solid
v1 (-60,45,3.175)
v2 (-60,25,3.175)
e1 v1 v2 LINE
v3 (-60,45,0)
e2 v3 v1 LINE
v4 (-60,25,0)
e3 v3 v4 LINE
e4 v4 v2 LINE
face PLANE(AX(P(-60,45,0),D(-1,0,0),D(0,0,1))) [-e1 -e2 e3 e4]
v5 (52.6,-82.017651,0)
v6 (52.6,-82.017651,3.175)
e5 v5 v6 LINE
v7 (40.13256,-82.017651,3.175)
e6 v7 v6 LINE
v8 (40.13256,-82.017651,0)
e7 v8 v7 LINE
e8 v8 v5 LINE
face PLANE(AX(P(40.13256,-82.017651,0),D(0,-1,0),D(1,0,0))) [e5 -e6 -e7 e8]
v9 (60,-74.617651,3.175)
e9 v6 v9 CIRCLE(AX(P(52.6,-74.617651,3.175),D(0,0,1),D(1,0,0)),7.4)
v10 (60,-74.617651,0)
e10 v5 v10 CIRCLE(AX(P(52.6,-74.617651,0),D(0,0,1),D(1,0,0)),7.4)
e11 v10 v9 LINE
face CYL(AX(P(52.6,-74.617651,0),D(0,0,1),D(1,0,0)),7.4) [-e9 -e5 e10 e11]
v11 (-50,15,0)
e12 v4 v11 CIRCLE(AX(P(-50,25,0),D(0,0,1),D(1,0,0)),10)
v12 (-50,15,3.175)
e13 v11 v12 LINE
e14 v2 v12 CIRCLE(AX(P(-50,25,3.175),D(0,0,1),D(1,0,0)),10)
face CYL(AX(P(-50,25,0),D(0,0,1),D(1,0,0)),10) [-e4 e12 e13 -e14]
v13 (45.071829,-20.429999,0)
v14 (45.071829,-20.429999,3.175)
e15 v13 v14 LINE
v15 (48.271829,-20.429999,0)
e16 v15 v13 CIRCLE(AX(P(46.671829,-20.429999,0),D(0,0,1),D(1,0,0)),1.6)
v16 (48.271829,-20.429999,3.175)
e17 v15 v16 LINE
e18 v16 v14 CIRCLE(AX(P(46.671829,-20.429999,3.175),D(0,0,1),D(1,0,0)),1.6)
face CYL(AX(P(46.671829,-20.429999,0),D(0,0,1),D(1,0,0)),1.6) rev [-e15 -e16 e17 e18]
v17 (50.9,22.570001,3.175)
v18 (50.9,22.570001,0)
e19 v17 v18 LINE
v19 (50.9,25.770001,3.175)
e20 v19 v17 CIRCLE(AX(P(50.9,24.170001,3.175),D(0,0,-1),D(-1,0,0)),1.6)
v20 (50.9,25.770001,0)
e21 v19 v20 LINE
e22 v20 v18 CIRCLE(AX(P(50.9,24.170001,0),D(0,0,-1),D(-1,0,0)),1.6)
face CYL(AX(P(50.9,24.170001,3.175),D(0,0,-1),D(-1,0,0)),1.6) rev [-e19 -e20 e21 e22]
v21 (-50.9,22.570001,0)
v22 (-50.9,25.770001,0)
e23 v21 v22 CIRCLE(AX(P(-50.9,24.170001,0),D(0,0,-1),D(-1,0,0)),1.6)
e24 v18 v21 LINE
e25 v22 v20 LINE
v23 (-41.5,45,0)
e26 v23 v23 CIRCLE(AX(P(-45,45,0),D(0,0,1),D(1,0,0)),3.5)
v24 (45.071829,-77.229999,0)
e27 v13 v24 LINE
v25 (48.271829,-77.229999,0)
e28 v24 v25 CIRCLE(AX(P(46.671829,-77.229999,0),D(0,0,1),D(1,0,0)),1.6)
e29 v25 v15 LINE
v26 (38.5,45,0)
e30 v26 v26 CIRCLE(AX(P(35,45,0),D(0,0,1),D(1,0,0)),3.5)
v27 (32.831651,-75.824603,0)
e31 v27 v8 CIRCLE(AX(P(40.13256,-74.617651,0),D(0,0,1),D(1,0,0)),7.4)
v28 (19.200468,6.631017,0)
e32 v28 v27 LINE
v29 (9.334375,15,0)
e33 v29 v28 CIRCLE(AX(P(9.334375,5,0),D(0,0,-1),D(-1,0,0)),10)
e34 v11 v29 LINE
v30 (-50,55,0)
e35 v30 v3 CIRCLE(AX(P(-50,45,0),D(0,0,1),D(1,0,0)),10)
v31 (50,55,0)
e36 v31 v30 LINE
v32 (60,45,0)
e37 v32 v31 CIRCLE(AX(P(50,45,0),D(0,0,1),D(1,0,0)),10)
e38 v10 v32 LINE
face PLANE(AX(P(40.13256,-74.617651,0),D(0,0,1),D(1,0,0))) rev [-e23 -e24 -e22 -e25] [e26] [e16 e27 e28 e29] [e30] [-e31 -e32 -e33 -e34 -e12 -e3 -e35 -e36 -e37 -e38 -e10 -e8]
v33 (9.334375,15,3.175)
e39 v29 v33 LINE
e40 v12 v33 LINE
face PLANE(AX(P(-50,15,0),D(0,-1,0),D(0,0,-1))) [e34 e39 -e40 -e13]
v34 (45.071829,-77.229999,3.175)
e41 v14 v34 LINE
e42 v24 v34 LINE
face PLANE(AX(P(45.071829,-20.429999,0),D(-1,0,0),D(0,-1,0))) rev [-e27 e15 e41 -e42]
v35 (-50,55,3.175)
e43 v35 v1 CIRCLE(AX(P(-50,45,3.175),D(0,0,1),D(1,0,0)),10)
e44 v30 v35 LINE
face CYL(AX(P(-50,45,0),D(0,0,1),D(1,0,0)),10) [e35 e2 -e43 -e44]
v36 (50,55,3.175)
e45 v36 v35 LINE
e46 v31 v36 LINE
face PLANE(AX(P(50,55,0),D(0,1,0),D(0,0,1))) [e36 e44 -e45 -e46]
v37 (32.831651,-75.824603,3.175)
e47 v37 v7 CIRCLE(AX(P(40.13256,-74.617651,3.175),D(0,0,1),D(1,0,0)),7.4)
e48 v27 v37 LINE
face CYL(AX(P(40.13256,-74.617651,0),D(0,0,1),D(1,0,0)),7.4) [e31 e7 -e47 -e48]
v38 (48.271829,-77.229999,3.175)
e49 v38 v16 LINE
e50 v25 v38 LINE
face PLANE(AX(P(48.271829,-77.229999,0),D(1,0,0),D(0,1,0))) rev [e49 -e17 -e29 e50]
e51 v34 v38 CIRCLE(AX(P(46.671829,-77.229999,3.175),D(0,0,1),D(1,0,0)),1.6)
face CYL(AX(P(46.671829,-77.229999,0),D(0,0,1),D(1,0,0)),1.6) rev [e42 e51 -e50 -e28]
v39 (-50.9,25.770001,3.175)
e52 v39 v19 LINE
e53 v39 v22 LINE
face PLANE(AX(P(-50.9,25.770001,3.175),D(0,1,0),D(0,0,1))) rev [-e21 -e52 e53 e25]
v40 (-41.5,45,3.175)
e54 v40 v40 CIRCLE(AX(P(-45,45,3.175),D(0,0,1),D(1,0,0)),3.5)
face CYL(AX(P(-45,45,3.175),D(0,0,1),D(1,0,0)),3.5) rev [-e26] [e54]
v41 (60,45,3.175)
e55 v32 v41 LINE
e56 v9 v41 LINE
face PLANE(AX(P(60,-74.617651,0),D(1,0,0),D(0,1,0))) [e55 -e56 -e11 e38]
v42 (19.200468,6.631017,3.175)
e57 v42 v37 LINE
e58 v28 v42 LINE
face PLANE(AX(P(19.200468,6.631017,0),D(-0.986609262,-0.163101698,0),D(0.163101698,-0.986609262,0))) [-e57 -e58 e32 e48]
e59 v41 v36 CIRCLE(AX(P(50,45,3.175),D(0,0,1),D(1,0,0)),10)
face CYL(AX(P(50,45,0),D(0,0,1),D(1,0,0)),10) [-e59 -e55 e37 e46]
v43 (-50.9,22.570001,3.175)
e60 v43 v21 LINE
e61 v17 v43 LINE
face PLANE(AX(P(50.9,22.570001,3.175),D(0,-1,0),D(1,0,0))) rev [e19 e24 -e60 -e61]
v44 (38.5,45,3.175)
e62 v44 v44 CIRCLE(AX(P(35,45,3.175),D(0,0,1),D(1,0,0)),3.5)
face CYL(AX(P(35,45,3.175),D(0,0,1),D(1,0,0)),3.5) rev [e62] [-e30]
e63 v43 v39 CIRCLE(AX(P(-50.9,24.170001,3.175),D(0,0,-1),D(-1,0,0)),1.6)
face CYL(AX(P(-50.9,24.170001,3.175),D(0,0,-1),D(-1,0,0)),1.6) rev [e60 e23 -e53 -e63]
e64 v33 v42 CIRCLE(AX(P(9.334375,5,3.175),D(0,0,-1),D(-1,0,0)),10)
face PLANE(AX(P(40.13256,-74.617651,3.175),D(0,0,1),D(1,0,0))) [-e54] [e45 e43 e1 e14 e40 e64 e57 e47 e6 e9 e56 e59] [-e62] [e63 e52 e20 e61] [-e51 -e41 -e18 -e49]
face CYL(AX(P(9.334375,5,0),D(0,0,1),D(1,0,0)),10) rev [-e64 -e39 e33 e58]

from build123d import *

# Parameters (mm, degrees)
BASE_FLANGE1_DEPTH       = 3.175
CUT_EXTRUDE1_DEPTH       = 102.670918338
CUT_EXTRUDE2_DEPTH       = 102.670918338
F_7_0_7_DIAMETER_HOLE1_D = 7


# Sheet-metal steps are written as plain solids
with BuildPart() as part:
    # Sketch11 → Base-Flange1 (new body)
    with BuildSketch(Plane.XY.offset(3.175)):
        with BuildLine():
            Line((40.132559776, -82.017650604), (52.6, -82.017650604))
            ThreePointArc((52.6, -82.017650604), (57.832590181, -79.850240785), (60, -74.617650604))
            Line((60, -74.617650604), (60, 45))
            ThreePointArc((60, 45), (57.071067812, 52.071067812), (50, 55))
            Line((50, 55), (-50, 55))
            ThreePointArc((-50, 55), (-57.071067812, 52.071067812), (-60, 45))
            Line((-60, 45), (-60, 25))
            ThreePointArc((-60, 25), (-57.071067812, 17.928932188), (-50, 15))
            Line((-50, 15), (9.334375382, 15))
            ThreePointArc((9.334375382, 15), (15.803139956, 12.62594813), (19.200468004, 6.631016977))
            Line((19.200468004, 6.631016977), (32.831651236, -75.824603167))
            ThreePointArc((32.831651236, -75.824603167), (35.345673992, -80.260852221), (40.132559776, -82.017650604))
        make_face()
    extrude(amount=-BASE_FLANGE1_DEPTH)

    # Sketch16 → Cut-Extrude1 (cut, through all)
    with BuildSketch(Plane.XY.offset(3.175)):
        with BuildLine():
            Line((45.071829224, -20.429999447), (45.071829224, -77.229999447))
            ThreePointArc((45.071829224, -77.229999447), (46.671829224, -78.829999447), (48.271829224, -77.229999447))
            Line((48.271829224, -77.229999447), (48.271829224, -20.429999447))
            ThreePointArc((48.271829224, -20.429999447), (46.671829224, -18.829999447), (45.071829224, -20.429999447))
        make_face()
    extrude(amount=-CUT_EXTRUDE1_DEPTH, mode=Mode.SUBTRACT)

    # Sketch17 → Cut-Extrude2 (cut, through all)
    with BuildSketch(Plane(origin=(0, 0, 0), x_dir=(-1, 0, 0), z_dir=(0, 0, -1))):
        with BuildLine():
            Line((50.9, 25.770000553), (-50.9, 25.770000553))
            ThreePointArc((-50.9, 25.770000553), (-52.5, 24.170000553), (-50.9, 22.570000553))
            Line((-50.9, 22.570000553), (50.9, 22.570000553))
            ThreePointArc((50.9, 22.570000553), (52.5, 24.170000553), (50.9, 25.770000553))
        make_face()
    extrude(amount=-CUT_EXTRUDE2_DEPTH, mode=Mode.SUBTRACT)

    # Ø7.0 (7) Diameter Hole1 (through all)
    with Locations(Plane.XY.offset(3.175)):
        with Locations((35, 45), (-45, 45)):
            Hole(F_7_0_7_DIAMETER_HOLE1_D / 2)


solid = part.part
